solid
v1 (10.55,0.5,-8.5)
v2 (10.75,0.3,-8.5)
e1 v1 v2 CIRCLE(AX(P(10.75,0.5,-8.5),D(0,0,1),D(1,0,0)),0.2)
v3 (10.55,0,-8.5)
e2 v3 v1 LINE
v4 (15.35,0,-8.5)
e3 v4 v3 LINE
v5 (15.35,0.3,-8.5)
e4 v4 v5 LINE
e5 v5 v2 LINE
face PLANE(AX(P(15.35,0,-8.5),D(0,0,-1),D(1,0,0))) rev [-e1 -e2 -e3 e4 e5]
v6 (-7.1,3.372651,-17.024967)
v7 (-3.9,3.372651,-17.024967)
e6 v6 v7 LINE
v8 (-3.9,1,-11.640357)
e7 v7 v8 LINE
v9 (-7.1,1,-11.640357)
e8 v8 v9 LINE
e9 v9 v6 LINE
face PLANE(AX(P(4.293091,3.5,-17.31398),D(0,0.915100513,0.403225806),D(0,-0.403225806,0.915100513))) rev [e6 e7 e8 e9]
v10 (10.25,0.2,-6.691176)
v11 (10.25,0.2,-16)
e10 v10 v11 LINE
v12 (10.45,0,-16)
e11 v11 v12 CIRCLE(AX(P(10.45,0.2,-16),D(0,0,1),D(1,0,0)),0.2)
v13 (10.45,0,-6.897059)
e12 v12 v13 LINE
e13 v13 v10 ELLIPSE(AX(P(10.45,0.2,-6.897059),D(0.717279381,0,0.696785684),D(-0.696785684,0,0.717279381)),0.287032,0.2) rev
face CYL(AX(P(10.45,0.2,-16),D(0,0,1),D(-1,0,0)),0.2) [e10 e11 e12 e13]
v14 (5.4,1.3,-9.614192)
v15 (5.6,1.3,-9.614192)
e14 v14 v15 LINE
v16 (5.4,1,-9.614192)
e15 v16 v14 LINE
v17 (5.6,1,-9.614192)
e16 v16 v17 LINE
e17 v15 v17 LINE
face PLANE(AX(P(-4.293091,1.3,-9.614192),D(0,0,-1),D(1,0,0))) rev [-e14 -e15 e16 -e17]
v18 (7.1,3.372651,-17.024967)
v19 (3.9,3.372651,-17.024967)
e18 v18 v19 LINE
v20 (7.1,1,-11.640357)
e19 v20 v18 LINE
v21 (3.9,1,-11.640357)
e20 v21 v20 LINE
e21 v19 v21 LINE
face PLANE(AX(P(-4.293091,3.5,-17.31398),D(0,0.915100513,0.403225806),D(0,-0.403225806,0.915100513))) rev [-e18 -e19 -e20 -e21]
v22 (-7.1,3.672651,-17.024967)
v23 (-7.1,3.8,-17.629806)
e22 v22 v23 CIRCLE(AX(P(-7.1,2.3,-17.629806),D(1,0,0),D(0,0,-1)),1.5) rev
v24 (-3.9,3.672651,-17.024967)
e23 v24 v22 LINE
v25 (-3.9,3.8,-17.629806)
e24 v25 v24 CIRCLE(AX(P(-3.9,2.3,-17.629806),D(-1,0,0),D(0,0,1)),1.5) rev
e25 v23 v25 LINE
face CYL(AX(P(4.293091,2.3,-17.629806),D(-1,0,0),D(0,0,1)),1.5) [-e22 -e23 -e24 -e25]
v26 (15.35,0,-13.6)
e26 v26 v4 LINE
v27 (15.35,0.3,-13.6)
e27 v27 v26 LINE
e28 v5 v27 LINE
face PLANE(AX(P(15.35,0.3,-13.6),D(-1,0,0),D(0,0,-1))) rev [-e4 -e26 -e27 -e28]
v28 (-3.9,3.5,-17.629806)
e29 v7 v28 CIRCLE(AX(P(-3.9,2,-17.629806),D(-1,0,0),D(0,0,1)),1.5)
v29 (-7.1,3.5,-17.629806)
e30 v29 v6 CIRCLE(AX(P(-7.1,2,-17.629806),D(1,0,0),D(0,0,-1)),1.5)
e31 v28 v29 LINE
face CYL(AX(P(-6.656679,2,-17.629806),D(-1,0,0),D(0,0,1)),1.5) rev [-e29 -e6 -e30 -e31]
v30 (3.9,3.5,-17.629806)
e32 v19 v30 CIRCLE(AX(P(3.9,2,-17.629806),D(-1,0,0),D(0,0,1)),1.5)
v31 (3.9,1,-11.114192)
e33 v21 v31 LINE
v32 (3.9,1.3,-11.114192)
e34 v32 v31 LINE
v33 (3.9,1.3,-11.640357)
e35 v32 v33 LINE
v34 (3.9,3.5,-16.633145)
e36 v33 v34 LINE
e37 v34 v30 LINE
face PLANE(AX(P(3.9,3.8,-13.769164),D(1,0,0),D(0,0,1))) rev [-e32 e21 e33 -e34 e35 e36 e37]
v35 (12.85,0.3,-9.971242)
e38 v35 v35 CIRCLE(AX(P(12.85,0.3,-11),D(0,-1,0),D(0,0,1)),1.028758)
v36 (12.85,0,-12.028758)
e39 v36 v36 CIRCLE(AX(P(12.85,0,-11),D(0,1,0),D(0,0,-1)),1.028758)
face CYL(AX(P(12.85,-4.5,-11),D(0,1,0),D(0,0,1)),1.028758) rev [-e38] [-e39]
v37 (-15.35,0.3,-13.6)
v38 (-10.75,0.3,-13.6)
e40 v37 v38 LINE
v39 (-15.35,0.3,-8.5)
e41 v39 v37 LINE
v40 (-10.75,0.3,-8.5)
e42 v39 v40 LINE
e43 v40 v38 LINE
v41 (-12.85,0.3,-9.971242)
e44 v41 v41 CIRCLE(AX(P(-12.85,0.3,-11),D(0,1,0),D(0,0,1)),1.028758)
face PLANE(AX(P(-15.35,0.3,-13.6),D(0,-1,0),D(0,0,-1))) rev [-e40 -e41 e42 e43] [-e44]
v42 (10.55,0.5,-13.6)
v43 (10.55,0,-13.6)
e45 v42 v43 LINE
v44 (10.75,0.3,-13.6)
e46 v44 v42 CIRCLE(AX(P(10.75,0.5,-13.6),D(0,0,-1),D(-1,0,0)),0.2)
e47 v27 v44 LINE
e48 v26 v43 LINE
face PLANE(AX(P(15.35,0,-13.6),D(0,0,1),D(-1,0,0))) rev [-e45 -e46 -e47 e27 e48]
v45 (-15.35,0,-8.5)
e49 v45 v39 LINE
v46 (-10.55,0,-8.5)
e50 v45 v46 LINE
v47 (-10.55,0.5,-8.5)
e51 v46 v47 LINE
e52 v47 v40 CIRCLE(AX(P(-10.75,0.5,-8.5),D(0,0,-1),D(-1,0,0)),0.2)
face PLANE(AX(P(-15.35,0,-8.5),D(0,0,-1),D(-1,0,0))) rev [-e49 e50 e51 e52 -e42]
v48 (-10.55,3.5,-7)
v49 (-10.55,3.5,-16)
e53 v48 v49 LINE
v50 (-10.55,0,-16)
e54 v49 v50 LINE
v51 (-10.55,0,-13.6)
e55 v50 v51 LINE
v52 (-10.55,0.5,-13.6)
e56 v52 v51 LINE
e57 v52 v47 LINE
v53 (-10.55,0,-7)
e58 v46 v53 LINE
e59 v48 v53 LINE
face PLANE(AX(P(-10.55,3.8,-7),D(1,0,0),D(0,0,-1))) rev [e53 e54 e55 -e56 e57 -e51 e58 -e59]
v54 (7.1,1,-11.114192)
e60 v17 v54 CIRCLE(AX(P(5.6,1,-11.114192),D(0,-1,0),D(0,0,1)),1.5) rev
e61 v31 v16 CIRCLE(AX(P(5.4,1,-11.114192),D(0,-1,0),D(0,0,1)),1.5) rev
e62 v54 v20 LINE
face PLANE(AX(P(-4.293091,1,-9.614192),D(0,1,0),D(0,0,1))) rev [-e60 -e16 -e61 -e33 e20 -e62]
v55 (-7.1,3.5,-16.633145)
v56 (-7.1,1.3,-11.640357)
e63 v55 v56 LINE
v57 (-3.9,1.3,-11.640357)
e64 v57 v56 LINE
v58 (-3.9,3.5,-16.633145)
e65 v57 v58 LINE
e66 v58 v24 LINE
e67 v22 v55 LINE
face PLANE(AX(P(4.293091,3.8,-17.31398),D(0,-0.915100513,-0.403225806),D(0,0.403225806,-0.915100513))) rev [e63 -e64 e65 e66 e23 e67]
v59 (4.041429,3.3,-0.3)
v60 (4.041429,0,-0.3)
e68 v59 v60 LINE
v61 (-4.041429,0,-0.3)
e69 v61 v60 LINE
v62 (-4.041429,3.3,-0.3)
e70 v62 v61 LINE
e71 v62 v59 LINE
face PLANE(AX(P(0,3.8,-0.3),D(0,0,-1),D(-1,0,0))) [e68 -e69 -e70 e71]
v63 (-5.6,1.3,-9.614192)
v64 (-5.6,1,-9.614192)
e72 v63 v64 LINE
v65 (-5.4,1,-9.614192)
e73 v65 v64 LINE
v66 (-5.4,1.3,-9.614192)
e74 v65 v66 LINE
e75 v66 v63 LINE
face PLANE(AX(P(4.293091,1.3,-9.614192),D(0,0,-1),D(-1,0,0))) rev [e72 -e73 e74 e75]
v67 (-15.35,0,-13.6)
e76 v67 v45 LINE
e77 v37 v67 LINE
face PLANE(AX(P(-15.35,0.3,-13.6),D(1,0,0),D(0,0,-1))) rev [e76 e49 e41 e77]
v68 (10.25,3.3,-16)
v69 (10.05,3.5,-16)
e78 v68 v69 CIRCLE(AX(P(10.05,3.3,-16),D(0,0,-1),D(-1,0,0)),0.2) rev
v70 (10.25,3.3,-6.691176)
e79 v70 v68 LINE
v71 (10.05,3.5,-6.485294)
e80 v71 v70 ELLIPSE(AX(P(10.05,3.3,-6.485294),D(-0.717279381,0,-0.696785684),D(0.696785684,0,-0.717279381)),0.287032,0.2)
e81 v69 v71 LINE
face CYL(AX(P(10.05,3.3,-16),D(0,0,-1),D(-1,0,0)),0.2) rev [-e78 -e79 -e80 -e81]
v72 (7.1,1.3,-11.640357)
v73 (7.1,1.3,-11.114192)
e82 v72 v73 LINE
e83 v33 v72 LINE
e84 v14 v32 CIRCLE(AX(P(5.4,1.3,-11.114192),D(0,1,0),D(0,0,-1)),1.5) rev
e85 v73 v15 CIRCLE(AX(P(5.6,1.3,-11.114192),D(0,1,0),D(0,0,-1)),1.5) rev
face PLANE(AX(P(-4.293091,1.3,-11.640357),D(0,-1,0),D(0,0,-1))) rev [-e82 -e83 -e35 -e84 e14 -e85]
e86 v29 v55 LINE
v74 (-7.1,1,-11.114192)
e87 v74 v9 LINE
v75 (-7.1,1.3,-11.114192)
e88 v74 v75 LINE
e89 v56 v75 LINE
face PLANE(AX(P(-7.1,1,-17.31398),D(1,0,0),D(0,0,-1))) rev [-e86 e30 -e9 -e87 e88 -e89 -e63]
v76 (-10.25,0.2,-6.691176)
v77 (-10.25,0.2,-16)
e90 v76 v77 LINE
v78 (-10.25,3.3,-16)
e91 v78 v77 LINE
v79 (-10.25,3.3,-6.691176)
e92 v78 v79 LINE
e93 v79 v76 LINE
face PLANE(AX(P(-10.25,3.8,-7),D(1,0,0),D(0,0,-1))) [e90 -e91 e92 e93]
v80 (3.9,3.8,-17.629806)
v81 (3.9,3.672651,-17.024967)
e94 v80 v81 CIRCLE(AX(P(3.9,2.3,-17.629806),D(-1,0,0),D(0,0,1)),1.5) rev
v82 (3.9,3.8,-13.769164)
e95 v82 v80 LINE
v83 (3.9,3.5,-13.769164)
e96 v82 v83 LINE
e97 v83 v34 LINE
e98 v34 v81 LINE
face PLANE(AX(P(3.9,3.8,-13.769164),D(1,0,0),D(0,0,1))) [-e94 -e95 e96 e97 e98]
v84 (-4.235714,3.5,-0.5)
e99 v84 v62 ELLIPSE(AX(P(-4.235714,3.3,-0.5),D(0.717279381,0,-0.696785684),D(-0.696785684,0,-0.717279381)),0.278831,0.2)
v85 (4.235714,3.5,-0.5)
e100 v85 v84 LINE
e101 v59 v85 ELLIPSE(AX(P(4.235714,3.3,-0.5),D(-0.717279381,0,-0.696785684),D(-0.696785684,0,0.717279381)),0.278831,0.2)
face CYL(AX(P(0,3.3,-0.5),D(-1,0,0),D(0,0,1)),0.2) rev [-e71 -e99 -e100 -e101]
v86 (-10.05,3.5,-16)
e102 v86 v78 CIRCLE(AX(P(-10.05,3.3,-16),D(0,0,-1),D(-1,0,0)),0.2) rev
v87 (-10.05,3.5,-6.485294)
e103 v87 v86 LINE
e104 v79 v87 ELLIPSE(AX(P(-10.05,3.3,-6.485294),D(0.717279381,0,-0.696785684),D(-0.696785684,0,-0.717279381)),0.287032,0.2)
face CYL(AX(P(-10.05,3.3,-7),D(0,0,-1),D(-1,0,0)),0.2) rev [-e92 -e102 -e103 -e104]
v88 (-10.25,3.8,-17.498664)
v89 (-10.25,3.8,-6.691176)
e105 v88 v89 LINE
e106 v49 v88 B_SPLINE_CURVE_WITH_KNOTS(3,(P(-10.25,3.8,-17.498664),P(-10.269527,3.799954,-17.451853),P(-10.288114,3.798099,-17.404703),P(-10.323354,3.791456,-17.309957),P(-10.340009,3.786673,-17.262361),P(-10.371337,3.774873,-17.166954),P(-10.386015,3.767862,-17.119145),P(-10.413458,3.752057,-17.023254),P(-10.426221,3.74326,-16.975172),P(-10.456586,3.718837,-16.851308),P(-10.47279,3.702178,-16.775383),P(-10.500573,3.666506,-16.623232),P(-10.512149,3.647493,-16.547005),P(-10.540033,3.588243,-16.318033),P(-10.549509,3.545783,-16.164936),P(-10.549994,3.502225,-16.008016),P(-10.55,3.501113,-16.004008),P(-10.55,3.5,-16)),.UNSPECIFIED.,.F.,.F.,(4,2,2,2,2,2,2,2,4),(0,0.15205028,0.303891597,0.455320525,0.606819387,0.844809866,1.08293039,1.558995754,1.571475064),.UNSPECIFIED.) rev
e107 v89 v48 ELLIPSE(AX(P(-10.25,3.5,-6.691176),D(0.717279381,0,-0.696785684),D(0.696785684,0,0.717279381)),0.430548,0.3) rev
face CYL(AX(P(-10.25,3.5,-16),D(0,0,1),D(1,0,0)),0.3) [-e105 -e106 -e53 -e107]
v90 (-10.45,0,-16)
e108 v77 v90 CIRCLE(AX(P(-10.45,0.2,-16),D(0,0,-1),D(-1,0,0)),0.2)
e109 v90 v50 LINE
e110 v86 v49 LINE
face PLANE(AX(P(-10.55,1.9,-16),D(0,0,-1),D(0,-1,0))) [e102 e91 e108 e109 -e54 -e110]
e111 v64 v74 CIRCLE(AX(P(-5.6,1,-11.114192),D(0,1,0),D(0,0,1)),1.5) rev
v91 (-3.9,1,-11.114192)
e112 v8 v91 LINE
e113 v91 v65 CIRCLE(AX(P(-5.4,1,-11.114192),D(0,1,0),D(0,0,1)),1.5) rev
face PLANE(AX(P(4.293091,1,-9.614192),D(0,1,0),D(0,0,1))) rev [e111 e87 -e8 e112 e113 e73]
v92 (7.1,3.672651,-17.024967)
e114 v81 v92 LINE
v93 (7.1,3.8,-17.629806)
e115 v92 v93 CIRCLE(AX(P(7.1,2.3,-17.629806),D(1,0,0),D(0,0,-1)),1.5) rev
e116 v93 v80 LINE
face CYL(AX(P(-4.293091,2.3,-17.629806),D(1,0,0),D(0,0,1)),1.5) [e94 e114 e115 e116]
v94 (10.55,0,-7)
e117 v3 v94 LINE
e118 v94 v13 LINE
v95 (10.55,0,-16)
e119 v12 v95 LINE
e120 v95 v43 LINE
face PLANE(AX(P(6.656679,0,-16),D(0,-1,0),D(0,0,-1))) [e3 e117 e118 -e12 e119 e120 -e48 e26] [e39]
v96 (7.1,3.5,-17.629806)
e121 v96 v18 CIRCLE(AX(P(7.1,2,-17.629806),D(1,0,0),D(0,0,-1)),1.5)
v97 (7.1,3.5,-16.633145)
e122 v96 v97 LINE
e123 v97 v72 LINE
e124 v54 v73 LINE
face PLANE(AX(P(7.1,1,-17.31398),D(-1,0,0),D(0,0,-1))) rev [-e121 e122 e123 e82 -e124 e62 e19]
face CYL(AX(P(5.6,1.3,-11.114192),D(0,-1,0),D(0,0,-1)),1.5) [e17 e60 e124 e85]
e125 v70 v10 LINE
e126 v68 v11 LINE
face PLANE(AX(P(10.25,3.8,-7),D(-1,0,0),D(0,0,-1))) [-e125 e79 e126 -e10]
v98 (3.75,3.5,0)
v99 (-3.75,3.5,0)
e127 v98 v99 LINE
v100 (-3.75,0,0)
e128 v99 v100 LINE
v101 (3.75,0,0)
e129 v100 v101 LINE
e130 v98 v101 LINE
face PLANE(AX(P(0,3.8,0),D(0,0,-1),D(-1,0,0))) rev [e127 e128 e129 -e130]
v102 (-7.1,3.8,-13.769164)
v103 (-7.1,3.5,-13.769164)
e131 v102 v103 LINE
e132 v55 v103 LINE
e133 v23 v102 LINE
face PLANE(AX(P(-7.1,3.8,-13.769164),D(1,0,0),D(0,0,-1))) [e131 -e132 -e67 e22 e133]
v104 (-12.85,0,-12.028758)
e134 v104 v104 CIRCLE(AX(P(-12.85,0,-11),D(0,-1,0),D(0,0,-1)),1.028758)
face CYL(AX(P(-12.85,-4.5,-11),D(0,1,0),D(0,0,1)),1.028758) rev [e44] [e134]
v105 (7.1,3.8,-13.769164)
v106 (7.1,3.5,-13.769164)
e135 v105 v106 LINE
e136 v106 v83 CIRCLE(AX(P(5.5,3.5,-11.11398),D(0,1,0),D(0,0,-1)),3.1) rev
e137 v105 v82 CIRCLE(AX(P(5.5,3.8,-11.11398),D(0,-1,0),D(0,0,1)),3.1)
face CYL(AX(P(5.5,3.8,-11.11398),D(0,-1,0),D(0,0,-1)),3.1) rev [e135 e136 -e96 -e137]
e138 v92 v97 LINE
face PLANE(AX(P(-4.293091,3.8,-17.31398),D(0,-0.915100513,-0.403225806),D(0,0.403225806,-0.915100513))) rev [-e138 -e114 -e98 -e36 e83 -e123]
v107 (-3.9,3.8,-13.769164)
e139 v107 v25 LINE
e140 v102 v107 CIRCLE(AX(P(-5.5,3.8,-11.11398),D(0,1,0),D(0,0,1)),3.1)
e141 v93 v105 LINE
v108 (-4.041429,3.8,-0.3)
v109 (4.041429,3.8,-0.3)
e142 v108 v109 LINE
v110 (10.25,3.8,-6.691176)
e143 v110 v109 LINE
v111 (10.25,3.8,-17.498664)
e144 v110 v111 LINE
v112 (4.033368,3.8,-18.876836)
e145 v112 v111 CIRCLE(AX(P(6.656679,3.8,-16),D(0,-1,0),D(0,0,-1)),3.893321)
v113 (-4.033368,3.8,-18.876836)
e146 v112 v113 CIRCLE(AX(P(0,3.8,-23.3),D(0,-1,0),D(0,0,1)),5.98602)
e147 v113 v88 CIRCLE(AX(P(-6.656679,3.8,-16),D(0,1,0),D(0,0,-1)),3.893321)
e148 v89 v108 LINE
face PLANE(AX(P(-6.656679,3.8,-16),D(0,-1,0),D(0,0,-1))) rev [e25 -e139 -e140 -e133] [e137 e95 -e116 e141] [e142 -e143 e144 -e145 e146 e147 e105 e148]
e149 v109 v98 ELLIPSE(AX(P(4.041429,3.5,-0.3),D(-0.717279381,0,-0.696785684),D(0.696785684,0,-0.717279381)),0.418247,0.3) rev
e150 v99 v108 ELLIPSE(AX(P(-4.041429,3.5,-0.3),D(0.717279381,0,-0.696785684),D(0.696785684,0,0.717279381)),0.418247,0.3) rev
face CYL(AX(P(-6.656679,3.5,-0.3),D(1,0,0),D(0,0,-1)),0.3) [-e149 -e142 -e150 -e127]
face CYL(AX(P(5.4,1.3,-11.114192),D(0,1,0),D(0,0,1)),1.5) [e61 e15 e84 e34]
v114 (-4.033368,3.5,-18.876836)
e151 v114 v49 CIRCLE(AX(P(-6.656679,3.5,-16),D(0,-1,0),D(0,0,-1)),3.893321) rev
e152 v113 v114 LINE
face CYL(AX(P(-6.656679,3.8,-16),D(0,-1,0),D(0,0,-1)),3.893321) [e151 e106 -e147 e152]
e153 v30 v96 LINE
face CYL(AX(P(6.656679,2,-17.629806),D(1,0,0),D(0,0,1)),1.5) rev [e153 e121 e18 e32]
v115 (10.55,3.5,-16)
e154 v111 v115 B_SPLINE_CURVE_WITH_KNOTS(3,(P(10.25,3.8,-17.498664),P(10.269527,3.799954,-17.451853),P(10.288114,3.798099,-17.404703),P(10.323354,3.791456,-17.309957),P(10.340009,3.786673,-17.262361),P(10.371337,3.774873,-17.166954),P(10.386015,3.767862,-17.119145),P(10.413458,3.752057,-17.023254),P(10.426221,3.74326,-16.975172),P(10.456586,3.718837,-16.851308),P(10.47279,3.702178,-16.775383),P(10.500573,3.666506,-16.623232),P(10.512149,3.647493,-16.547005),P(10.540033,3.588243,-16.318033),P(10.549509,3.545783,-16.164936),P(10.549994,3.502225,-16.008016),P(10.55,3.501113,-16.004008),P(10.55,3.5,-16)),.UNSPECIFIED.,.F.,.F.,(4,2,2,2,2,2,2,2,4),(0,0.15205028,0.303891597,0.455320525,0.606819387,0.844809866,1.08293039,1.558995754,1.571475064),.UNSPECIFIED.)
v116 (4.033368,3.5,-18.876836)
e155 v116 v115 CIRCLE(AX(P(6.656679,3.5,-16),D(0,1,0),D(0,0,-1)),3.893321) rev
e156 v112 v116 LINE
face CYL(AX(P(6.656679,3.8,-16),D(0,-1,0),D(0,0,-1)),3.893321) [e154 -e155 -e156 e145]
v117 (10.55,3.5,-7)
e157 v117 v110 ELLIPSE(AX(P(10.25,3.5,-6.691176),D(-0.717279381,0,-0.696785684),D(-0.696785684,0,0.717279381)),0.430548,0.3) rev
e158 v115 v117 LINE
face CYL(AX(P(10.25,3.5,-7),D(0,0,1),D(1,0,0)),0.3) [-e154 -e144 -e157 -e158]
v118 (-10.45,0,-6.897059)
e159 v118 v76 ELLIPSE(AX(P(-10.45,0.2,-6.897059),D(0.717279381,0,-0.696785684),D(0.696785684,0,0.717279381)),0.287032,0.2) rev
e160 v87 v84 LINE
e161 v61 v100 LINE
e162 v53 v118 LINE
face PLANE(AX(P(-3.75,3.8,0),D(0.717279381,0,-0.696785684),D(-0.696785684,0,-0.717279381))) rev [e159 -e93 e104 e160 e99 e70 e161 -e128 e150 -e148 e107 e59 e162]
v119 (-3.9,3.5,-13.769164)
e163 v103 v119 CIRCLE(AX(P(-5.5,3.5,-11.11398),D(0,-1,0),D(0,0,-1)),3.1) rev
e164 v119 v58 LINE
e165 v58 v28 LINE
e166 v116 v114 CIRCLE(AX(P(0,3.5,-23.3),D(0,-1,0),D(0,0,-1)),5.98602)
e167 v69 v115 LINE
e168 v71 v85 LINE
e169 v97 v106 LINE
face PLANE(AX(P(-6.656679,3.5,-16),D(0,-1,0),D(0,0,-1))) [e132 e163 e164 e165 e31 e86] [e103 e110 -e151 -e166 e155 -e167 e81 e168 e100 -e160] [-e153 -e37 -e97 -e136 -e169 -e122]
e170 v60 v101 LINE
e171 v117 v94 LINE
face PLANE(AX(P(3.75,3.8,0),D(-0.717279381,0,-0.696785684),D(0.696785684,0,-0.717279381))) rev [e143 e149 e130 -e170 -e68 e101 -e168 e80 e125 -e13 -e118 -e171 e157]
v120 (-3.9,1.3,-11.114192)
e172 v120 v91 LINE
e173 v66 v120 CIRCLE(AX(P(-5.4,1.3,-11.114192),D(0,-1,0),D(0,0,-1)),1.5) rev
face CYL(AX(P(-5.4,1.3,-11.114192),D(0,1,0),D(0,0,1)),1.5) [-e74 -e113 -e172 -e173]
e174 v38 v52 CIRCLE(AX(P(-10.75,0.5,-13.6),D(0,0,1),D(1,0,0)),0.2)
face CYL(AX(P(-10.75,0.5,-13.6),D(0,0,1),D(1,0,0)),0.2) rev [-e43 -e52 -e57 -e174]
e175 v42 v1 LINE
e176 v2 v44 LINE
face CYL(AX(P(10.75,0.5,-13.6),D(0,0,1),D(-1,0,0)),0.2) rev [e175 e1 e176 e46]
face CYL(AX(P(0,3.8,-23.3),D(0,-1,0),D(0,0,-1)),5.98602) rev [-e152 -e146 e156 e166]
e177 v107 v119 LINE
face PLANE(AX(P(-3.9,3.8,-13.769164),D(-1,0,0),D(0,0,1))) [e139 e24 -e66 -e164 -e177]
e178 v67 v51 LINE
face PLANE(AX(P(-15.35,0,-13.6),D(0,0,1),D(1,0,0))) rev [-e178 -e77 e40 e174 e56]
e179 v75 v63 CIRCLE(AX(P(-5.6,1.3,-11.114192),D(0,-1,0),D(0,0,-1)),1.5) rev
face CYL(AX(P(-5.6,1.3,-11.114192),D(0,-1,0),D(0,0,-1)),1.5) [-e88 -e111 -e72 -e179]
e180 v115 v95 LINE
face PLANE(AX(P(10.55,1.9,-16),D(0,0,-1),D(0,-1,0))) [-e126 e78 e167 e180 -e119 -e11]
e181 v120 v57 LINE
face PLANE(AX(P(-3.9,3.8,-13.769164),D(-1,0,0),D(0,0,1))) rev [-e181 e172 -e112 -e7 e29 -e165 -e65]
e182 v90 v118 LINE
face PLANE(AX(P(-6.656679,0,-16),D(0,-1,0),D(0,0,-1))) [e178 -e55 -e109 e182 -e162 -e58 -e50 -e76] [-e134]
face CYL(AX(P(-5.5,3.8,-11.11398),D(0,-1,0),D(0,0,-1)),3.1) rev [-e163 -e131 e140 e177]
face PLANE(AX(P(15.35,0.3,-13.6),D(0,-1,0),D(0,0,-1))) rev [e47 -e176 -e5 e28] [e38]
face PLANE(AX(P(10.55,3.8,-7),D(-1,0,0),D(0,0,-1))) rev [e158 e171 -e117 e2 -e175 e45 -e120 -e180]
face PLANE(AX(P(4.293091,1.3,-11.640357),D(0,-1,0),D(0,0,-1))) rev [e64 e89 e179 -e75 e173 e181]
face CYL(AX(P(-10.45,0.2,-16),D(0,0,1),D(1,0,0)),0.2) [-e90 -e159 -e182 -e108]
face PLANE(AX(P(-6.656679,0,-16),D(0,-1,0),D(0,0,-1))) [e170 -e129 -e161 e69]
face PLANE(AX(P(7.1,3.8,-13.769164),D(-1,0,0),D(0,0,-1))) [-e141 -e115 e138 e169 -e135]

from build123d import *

# Parameters (mm, degrees)
BOSS_EXTRUDE1_DEPTH = 3.8
SHELL1_START        = -21
SHELL1_OUTLINE_W    = 10.25
SHELL1_OUTLINE_H    = 3.5
SHELL1_DEPTH        = 20.7
SHELL1_START_2      = -19.893320937
SHELL1_2_OUTLINE_W  = 1.75
SHELL1_2_OUTLINE_H  = 3.5
SHELL1_2_DEPTH      = 3.893320937
BOSS_EXTRUDE2_DEPTH = 3.2
FILLET1_R           = 1.5
FILLET2_R           = 1.5
SKETCH4_W           = 5.1
SKETCH4_H           = 0.3
BOSS_EXTRUDE3_DEPTH = 4.8
FILLET3_R           = 0.2
SKETCH5_R           = 1.028757753
CUT_EXTRUDE1_DEPTH  = 4.8
FILLET4_R           = 0.2
FILLET5_R           = 0.2
FILLET6_START       = -5
FILLET6_DEPTH       = 10
FILLET6_START_2     = -19.893320937
FILLET6_2_DEPTH     = 13.893320937


with BuildPart() as part:
    # Sketch2 → Boss-Extrude1 (new body)
    with BuildSketch(Plane(origin=(0, 0, 0), x_dir=(1, 0, 0), z_dir=(0, 1, 0))):
        with BuildLine():
            Line((0, 0), (-3.75, 0))
            Line((-3.75, 0), (-10.55, 7))
            Line((-10.55, 7), (-10.55, 16))
            ThreePointArc((-10.55, 16), (-8.229026759, 19.561694912), (-4.03336762, 18.876835935))
            ThreePointArc((-4.03336762, 18.876835935), (-2.162785983, 17.71835226), (0, 17.313980062))
            Line((0, 17.313980062), (0, 0))
        make_face()
        with BuildLine():
            Line((-7.1, 13.769163671), (-7.1, 17.313980062))
            Line((-7.1, 17.313980062), (-3.9, 17.313980062))
            Line((-3.9, 17.313980062), (-3.9, 13.769163671))
            ThreePointArc((-3.9, 13.769163671), (-5.5, 8.013980062), (-7.1, 13.769163671))
        make_face(mode=Mode.SUBTRACT)
    extrude(amount=BOSS_EXTRUDE1_DEPTH)

    # Shell1: read off the stored shape, not the designer's step
    # Shell1 outline → Shell1 (cut)
    with BuildSketch(Plane.XY.offset(SHELL1_START)):
        with Locations((-5.125, 1.75)):
            Rectangle(SHELL1_OUTLINE_W, SHELL1_OUTLINE_H)
    extrude(amount=SHELL1_DEPTH, mode=Mode.SUBTRACT)

    # Shell1 2 outline → Shell1 2 (cut)
    with BuildSketch(Plane.XY.offset(SHELL1_START_2)):
        with Locations((-11.125, 1.75)):
            Rectangle(SHELL1_2_OUTLINE_W, SHELL1_2_OUTLINE_H)
    extrude(amount=SHELL1_2_DEPTH, mode=Mode.SUBTRACT)

    # Sketch3 → Boss-Extrude2 (add)
    with BuildSketch(Plane(origin=(-7.1, 0, 0), x_dir=(0, 0, -1), z_dir=(1, 0, 0))):
        Polygon((17.313980062, 3.5), (11.640356881, 1), (9.614191522, 1), (9.614191522, 1.3), (11.640356881, 1.3), (17.313980062, 3.8), align=None)
    extrude(amount=BOSS_EXTRUDE2_DEPTH)

    # Fillet1
    fillet1_edges = [part.edges().sort_by_distance(p)[0] for p in [
        (-3.9, 1.15, -9.614191522),
        (-7.1, 1.15, -9.614191522),
    ]]
    fillet(fillet1_edges, radius=FILLET1_R)

    # Fillet2
    fillet2_edges = [part.edges().sort_by_distance(p)[0] for p in [
        (-5.5, 3.8, -17.313980062),
        (-5.5, 3.5, -17.313980062),
    ]]
    fillet(fillet2_edges, radius=FILLET2_R)

    # Sketch4 → Boss-Extrude3 (add)
    with BuildSketch(Plane.ZY.offset(10.55)):
        with Locations((-11.05, 0.15)):
            Rectangle(SKETCH4_W, SKETCH4_H)
    extrude(amount=BOSS_EXTRUDE3_DEPTH)

    # Fillet3
    fillet3_edges = [part.edges().sort_by_distance(p)[0] for p in [
        (-10.55, 0.3, -11.05),
    ]]
    fillet(fillet3_edges, radius=FILLET3_R)

    # Sketch5 → Cut-Extrude1 (cut)
    with BuildSketch(Plane(origin=(0, 0.3, 0), x_dir=(1, 0, 0), z_dir=(0, 1, 0))):
        with Locations(Location((-12.85, 11, 0), (0, 0, 270))):
            Circle(SKETCH5_R)
    extrude(amount=-CUT_EXTRUDE1_DEPTH, mode=Mode.SUBTRACT)

    # Fillet4
    fillet4_edges = [part.edges().sort_by_distance(p)[0] for p in [
        (-10.25, 0, -11.345588235),
    ]]
    fillet(fillet4_edges, radius=FILLET4_R)

    # Mirror1: part across plane


with BuildPart() as part_1:
    add(part.part)
    add(part.part.mirror(Plane(origin=(0, 3.8, -17.313980062), x_dir=(0, 0, 1), z_dir=(-1, 0, 0))))

    # Fillet5
    fillet5_edges = [part_1.edges().sort_by_distance(p)[0] for p in [
        (10.25, 3.5, -11.345588235),
        (-10.25, 3.5, -11.345588235),
        (0, 3.5, -0.3),
    ]]
    fillet(fillet5_edges, radius=FILLET5_R)

    # Fillet6: read off the stored shape, not the designer's step
    # Fillet6 outline → Fillet6 (cut)
    with BuildSketch(Plane.YZ.offset(FILLET6_START)):
        with BuildLine():
            ThreePointArc((3.5, 0), (3.712132034, -0.087867966), (3.8, -0.3))
            Line((3.8, -0.3), (3.8, 0))
            Line((3.8, 0), (3.5, 0))
        make_face()
    extrude(amount=FILLET6_DEPTH, mode=Mode.SUBTRACT)

    # Fillet6 2 outline → Fillet6 2 (cut)
    with BuildSketch(Plane.XY.offset(FILLET6_START_2)):
        with BuildLine():
            Line((10.55, 3.8), (10.25, 3.8))
            ThreePointArc((10.25, 3.8), (10.462132034, 3.712132034), (10.55, 3.5))
            Line((10.55, 3.5), (10.55, 3.8))
        make_face()
        with BuildLine():
            ThreePointArc((-10.55, 3.5), (-10.462132034, 3.712132034), (-10.25, 3.8))
            Line((-10.25, 3.8), (-10.55, 3.8))
            Line((-10.55, 3.8), (-10.55, 3.5))
        make_face()
    extrude(amount=FILLET6_2_DEPTH, mode=Mode.SUBTRACT)


solid = part_1.part
